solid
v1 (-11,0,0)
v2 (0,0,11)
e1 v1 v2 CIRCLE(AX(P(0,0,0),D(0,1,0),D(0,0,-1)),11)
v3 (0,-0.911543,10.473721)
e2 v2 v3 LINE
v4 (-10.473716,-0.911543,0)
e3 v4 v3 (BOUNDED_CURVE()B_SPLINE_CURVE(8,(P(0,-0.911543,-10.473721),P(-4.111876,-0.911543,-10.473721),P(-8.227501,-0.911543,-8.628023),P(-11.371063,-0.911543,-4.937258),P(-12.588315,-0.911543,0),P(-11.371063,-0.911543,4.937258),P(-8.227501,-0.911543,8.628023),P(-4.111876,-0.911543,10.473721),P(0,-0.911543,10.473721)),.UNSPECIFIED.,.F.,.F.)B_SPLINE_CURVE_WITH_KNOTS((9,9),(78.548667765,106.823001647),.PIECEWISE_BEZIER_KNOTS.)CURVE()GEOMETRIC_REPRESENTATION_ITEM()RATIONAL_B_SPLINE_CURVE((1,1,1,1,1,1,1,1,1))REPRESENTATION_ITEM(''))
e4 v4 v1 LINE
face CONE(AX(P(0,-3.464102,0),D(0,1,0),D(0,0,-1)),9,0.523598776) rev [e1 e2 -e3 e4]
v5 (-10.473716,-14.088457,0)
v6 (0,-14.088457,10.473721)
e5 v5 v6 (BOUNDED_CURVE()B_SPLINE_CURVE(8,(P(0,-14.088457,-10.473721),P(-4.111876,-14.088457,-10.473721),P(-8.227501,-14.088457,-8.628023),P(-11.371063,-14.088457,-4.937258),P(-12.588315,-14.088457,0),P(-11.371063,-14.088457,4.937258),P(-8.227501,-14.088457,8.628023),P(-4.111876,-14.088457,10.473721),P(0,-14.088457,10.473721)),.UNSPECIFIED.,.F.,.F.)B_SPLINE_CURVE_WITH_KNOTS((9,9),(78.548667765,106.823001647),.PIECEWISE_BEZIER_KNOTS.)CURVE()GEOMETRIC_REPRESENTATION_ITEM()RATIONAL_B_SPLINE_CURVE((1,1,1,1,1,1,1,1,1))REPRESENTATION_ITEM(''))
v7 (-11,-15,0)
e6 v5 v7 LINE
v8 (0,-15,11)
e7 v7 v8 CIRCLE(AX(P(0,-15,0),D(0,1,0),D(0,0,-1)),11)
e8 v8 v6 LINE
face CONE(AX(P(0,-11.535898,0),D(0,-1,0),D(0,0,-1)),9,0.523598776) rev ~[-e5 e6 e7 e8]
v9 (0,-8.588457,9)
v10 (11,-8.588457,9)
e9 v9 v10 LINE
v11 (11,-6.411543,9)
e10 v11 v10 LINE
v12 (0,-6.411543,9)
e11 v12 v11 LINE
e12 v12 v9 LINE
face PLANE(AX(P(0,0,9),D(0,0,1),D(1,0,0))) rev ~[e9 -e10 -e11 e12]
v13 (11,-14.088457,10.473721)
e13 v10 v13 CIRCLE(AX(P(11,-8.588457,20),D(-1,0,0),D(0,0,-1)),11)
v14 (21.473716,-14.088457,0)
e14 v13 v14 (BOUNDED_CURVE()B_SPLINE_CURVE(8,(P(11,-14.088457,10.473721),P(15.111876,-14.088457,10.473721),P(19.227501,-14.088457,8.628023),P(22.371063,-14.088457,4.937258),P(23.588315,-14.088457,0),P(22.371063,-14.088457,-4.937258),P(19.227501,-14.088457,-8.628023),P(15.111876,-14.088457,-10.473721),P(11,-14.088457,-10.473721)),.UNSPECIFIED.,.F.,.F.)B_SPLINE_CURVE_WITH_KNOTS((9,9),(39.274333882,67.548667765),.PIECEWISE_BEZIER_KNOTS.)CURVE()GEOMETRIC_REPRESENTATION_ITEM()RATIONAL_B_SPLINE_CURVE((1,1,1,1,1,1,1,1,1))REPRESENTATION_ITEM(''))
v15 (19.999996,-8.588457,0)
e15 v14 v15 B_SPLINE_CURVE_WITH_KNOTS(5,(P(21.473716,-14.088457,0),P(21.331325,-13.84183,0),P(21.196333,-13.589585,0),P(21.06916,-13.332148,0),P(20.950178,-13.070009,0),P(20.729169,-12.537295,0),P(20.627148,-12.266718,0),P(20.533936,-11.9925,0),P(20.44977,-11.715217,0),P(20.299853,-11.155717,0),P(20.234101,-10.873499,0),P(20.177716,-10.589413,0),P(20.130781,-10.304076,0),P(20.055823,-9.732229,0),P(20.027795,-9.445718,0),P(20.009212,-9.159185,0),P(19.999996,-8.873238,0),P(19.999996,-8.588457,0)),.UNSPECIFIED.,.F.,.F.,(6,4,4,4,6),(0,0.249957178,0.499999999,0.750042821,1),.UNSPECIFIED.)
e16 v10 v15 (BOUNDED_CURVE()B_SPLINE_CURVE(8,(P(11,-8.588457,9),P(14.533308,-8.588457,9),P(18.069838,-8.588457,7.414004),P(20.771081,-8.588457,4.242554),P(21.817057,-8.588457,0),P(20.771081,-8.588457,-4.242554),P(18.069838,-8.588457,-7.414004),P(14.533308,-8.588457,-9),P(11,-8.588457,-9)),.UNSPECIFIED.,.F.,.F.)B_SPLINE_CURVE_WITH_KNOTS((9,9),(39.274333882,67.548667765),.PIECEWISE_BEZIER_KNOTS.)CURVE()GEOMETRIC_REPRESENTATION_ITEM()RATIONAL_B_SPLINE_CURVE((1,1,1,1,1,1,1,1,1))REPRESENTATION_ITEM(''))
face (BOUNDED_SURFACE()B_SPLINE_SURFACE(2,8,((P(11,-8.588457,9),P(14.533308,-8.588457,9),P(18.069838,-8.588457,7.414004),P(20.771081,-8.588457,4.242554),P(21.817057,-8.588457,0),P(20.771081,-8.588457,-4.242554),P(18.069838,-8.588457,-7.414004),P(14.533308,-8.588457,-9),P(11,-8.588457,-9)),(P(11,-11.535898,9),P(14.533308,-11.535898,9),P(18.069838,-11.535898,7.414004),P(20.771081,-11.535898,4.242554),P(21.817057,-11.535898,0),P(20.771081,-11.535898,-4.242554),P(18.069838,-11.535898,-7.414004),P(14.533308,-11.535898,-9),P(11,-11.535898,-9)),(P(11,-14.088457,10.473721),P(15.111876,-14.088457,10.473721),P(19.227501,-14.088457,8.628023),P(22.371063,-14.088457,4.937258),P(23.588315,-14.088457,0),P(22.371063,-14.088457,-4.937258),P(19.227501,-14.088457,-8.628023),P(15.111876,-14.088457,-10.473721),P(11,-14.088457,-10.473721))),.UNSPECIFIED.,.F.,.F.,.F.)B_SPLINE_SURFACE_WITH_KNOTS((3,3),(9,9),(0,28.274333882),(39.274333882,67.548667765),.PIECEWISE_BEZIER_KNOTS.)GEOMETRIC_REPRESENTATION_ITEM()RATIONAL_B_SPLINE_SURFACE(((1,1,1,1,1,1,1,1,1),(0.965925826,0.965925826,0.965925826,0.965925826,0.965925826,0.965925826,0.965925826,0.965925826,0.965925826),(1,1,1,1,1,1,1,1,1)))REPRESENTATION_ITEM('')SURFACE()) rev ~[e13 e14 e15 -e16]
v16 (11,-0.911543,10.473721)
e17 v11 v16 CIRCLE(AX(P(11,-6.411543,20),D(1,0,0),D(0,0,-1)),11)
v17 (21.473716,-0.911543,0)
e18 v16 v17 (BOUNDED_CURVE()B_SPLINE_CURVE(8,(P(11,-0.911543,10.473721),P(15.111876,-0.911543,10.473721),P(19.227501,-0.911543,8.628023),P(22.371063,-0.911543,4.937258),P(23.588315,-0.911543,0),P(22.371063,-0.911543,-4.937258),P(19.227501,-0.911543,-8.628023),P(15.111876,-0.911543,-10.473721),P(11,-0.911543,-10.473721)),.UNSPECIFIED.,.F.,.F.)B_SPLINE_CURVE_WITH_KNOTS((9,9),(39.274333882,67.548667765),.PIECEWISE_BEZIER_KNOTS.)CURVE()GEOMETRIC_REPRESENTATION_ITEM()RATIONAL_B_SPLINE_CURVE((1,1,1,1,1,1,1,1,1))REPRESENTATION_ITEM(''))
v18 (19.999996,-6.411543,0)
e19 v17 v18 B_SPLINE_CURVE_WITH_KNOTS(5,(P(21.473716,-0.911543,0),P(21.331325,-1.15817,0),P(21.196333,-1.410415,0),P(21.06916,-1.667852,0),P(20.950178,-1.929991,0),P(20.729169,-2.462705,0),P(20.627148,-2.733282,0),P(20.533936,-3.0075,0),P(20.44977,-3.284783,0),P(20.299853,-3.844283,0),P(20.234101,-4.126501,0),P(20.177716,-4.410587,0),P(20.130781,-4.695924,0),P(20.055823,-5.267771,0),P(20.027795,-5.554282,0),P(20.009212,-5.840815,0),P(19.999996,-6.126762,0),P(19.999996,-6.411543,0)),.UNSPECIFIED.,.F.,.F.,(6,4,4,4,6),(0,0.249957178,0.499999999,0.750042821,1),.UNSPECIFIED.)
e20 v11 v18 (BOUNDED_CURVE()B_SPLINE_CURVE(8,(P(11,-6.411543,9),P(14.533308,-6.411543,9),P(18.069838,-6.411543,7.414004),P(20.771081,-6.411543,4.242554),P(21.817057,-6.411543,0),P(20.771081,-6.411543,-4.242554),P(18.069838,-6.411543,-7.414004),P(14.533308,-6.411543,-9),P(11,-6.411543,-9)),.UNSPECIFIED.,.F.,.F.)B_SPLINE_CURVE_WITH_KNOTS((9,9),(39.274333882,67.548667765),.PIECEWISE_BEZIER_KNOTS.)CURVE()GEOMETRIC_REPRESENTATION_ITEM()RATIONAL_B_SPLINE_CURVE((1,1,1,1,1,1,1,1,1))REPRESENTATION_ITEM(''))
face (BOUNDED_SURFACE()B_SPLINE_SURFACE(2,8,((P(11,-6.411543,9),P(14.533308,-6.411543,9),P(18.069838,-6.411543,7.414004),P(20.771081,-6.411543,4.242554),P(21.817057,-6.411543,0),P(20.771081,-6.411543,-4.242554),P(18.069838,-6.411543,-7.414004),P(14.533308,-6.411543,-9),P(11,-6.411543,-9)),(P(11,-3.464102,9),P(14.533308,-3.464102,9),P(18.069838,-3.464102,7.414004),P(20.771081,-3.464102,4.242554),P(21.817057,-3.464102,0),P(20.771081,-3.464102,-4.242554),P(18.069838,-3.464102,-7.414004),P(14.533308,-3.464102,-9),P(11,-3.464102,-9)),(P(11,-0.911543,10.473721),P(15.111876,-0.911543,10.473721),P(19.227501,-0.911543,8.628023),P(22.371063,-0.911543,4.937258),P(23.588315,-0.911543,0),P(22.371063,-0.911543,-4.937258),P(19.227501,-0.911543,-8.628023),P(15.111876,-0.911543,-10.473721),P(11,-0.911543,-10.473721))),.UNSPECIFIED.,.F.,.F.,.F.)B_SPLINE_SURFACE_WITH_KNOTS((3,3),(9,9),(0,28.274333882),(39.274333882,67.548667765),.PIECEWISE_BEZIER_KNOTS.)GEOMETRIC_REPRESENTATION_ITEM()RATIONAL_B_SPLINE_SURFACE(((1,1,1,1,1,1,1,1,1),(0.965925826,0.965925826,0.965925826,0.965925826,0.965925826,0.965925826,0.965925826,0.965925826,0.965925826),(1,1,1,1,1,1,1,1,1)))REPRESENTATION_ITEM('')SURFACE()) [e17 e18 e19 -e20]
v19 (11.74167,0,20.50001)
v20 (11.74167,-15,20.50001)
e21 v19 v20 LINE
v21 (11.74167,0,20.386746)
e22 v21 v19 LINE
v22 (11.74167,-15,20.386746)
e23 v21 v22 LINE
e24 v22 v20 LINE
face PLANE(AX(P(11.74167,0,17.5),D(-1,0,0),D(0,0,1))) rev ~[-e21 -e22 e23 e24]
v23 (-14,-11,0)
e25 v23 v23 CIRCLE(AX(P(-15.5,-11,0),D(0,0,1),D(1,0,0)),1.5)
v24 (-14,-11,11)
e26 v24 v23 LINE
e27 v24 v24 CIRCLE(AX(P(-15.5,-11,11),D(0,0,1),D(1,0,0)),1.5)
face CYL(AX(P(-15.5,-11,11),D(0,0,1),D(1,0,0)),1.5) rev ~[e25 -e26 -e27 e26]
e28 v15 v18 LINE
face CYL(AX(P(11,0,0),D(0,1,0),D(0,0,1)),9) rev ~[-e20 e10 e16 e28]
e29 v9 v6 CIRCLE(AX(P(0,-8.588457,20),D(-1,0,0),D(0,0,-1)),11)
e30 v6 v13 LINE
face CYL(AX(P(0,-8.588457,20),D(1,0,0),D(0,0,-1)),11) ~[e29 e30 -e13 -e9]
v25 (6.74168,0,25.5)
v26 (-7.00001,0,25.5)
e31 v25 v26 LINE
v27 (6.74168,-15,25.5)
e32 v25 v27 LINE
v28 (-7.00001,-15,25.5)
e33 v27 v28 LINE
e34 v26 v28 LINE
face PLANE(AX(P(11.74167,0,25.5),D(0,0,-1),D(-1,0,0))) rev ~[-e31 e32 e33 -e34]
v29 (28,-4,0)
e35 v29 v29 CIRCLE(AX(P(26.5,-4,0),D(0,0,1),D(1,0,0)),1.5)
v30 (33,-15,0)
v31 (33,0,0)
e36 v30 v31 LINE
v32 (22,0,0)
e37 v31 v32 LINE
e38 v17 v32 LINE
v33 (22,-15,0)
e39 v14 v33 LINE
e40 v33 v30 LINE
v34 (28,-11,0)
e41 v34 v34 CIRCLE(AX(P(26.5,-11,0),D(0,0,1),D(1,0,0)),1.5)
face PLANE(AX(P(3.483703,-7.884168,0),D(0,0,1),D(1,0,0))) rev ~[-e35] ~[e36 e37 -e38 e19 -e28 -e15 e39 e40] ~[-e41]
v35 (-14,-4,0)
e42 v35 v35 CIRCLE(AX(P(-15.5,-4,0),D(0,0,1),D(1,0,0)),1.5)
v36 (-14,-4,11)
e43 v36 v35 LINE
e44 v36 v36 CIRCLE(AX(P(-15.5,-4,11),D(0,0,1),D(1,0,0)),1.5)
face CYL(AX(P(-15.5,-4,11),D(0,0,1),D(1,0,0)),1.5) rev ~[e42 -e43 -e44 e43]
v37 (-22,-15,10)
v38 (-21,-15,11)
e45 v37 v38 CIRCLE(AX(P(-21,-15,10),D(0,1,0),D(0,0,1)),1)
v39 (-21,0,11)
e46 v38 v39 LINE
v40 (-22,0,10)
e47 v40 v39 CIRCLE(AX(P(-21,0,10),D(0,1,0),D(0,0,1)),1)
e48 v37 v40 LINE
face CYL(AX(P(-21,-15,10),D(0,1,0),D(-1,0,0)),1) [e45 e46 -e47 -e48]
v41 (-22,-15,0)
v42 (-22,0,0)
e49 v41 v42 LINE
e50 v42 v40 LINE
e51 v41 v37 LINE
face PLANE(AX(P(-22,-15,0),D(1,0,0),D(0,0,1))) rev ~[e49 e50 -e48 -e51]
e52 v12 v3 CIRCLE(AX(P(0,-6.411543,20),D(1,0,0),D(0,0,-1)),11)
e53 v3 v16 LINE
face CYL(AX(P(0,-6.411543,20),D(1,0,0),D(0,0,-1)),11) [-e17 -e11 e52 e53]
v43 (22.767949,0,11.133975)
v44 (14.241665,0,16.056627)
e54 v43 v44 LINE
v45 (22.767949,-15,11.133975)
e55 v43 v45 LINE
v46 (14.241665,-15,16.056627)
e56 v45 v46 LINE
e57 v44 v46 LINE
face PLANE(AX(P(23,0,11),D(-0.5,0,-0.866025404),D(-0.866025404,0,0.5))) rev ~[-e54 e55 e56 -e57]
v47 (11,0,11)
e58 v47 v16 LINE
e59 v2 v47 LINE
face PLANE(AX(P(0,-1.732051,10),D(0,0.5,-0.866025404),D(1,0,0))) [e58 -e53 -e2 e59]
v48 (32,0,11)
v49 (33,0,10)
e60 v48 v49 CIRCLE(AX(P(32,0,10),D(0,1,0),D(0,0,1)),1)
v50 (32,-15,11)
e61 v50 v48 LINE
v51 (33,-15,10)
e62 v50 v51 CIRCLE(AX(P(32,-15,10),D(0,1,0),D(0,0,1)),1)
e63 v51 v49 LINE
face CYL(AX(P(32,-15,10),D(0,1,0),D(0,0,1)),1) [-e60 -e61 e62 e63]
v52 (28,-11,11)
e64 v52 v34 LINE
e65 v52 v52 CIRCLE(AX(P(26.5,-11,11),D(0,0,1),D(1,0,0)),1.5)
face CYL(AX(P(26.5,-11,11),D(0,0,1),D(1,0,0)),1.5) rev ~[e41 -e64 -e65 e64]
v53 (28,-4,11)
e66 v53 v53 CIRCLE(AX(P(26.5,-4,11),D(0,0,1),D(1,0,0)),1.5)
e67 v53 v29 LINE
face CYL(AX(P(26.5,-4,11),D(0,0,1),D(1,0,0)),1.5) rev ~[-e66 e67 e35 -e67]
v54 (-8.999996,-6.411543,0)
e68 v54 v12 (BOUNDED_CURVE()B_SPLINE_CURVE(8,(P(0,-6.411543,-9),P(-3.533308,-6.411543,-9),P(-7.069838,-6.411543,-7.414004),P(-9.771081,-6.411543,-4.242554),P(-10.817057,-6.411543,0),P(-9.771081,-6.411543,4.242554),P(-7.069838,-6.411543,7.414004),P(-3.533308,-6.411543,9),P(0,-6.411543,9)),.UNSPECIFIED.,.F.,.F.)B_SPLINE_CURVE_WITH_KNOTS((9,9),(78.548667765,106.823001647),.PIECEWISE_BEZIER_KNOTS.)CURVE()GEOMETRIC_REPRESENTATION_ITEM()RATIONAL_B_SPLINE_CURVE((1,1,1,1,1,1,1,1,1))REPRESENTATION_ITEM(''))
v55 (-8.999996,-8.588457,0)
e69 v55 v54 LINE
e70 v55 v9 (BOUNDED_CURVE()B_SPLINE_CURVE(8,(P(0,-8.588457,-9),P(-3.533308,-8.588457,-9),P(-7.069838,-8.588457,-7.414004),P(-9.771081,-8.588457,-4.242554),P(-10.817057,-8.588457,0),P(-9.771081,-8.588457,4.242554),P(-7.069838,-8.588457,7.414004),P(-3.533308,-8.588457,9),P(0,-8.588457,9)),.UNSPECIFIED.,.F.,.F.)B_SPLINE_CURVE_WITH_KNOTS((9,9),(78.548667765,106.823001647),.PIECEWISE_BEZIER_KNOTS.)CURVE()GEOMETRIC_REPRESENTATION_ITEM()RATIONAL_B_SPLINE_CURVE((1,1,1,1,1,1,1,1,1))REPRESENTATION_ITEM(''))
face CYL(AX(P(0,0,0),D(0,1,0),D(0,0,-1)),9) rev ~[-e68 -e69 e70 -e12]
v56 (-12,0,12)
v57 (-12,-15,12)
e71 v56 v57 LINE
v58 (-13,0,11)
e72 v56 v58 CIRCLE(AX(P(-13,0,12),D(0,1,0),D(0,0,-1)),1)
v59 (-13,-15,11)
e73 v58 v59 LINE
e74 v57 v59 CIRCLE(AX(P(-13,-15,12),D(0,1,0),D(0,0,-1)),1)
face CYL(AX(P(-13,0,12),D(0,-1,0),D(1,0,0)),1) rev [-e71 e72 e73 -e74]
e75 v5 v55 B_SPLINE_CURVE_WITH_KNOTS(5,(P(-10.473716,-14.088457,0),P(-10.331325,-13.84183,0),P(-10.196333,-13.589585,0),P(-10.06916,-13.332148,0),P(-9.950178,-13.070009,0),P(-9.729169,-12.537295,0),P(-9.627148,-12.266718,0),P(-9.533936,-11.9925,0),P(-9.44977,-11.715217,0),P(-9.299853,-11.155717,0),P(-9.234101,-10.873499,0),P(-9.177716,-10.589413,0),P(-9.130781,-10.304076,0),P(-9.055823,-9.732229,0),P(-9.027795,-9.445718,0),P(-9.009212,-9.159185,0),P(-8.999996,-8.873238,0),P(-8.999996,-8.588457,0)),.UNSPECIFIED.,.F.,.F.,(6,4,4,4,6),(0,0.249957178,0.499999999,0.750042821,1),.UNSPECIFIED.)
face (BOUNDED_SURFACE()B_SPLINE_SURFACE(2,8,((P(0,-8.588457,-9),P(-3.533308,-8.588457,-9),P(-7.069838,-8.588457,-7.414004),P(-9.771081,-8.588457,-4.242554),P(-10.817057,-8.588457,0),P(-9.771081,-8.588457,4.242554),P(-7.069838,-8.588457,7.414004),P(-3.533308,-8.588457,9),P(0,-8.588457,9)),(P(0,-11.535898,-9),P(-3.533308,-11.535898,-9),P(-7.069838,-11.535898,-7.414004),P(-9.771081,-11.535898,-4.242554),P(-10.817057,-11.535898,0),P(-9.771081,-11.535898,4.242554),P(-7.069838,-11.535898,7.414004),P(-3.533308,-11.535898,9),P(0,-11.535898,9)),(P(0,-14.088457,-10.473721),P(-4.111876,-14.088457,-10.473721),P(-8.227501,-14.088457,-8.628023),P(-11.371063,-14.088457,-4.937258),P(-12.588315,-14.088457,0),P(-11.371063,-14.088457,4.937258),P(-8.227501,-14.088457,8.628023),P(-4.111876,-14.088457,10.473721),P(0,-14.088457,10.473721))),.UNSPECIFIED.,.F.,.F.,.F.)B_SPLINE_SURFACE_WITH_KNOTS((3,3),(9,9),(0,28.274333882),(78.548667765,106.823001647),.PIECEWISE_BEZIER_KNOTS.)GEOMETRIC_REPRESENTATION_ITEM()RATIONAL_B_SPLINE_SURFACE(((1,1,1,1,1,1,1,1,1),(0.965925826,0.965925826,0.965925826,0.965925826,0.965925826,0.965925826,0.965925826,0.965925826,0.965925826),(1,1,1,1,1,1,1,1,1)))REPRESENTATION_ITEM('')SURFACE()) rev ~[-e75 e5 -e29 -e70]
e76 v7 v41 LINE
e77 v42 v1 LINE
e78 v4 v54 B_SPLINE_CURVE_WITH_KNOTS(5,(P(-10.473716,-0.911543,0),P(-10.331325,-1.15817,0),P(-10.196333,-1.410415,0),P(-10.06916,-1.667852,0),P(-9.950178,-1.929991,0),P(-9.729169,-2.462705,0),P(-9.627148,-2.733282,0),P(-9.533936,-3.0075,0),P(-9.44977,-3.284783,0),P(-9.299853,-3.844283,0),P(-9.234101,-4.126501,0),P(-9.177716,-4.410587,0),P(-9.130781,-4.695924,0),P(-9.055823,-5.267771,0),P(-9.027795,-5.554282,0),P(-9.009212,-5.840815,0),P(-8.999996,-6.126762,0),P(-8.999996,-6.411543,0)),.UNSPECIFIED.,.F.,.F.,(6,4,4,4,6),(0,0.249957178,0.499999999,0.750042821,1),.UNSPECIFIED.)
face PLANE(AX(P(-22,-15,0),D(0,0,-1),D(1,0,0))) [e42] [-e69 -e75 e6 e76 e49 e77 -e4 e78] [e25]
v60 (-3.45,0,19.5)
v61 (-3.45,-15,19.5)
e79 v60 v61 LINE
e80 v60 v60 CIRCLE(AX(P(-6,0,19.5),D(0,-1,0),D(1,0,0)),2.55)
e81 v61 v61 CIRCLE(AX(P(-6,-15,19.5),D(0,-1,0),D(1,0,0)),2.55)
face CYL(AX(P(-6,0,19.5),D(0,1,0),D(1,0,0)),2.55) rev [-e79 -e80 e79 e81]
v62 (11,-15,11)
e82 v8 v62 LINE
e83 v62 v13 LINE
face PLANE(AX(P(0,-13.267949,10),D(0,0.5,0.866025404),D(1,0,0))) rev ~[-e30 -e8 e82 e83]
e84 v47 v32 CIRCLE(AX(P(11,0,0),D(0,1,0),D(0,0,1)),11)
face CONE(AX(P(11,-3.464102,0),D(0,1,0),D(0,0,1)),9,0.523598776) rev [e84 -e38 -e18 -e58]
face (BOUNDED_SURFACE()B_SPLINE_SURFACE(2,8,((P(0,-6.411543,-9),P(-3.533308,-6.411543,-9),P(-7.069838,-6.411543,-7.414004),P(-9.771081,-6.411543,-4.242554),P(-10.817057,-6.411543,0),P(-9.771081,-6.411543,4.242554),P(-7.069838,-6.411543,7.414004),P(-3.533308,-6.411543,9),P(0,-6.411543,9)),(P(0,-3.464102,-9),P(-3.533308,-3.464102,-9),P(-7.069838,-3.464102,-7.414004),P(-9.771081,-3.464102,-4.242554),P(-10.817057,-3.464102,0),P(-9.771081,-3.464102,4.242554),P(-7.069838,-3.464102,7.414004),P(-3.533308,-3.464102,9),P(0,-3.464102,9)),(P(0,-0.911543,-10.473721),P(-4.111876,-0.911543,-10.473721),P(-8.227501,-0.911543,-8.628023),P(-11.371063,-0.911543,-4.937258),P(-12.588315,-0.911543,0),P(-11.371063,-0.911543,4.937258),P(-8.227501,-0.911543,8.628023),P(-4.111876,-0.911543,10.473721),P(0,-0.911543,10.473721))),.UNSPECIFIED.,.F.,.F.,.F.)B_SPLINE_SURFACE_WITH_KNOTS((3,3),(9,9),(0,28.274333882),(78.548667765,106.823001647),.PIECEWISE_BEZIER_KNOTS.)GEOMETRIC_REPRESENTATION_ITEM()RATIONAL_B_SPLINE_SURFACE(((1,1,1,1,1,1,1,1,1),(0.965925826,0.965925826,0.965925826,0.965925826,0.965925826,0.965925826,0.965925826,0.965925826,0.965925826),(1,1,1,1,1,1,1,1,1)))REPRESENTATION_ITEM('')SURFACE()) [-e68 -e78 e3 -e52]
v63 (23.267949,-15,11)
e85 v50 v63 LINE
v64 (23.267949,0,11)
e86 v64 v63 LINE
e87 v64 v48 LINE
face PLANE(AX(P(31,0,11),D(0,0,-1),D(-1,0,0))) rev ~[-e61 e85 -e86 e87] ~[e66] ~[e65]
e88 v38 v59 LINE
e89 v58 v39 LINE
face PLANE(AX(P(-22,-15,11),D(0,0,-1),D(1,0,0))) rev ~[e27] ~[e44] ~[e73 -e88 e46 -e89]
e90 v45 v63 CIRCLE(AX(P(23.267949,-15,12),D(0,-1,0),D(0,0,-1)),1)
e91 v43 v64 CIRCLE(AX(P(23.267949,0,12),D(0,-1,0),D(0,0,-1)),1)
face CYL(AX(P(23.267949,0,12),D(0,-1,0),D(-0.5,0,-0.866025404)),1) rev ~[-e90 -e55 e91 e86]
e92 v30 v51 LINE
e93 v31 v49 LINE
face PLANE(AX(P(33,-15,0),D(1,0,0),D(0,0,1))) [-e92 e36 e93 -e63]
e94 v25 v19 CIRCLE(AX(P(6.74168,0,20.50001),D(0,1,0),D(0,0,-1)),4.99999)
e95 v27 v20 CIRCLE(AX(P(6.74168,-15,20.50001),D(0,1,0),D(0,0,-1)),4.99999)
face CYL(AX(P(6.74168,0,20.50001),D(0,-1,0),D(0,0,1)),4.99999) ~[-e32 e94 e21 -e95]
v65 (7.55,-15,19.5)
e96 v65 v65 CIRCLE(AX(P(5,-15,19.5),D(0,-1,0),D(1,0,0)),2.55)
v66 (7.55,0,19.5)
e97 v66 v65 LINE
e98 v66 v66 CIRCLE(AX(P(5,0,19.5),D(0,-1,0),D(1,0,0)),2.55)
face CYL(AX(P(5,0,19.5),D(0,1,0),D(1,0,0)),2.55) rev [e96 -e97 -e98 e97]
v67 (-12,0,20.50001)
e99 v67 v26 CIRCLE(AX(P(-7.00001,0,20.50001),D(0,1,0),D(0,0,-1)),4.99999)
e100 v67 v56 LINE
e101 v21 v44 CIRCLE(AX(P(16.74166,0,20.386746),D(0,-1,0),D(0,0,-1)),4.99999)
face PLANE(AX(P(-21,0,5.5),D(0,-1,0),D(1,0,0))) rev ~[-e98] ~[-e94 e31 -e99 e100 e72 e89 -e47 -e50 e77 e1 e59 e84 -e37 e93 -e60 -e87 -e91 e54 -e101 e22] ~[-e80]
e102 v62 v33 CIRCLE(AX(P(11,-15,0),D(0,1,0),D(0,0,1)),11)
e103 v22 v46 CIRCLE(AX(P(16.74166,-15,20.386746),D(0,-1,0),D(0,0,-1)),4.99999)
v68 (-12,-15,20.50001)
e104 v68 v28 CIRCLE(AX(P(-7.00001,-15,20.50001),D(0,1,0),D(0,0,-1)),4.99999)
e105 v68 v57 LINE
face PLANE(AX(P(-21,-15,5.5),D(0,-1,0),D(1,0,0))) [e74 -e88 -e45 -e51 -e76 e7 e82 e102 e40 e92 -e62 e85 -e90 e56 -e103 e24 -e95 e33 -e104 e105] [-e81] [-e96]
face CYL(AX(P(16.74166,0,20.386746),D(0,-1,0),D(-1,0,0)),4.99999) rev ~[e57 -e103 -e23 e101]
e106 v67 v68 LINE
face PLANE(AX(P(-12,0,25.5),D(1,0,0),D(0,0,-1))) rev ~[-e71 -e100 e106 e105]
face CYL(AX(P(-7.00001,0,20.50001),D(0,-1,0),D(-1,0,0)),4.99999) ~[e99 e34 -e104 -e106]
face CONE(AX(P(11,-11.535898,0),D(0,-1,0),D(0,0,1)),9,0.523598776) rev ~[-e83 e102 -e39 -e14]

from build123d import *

# Parameters (mm, degrees)
F0_R       = 2.55
F1_DEPTH   = 15
F2_R       = 4.99999
F3_R       = 1.5
F4_DEPTH   = 25
F5_R       = 1.5
F6_DEPTH   = 25
F7_SIZE2   = 3.4641016151
F7_SIZE    = 2
F7_2_SIZE2 = 3.4641016151
F7_2_SIZE  = 2
F8_R       = 11
F9_R       = 1
F10_W      = 76.274741441
F10_H      = 34.1036086902
F11_DEPTH  = 25
F12_W      = 2
F12_H      = 11
F13_DEPTH  = 15
F14_R      = 1


# Not quite as in the source:
# - a fillet or chamfer is up to 0.001 mm smaller than in the source, because OpenCascade refuses the exact size


with BuildPart() as f1:
    # F0 (on Front) → F1 (new body)
    with BuildSketch(Plane.XZ):
        Polygon((-20, 11), (-20, 0), (-20, -10), (-12, -10), (-12, -15), (23, -15), (23, -10), (31, -10), (31, 11), (23, 11), (11.7416697508, 17.5), (11.7416697508, 25.5), (-12, 25.5), (-12, 11), align=None)
        with BuildLine():
            ThreePointArc((0, -9), (-9, 0), (0, 9))
            Line((0, 9), (11, 9))
            ThreePointArc((11, 9), (20, 0), (11, -9))
            Line((11, -9), (0, -9))
        make_face(mode=Mode.SUBTRACT)
        with Locations((-6, 19.5)):
            Circle(F0_R, mode=Mode.SUBTRACT)
        with Locations((5, 19.5)):
            Circle(F0_R, mode=Mode.SUBTRACT)
    extrude(amount=F1_DEPTH)

    # F2 (radius 5 in the source; OpenCascade refuses exactly that, so slightly less here)
    f2_edges = [f1.edges().sort_by_distance(p)[0] for p in [
        (11.74167, -7.5, 25.5),
        (-12, -7.5, 25.5),
        (-12, -7.5, -15),
        (23, -7.5, -15),
        (11.74167, -7.5, 17.5),
    ]]
    fillet(f2_edges, radius=F2_R)

    # F3 (on face) → F4 (cut)
    with BuildSketch(Plane.XY.offset(11)):
        with Locations((-15.5, -4)):
            Circle(F3_R)
        with Locations((-15.5, -11)):
            Circle(F3_R)
    extrude(amount=-F4_DEPTH, mode=Mode.SUBTRACT)

    # F5 (on face) → F6 (cut)
    with BuildSketch(Plane.XY.offset(11)):
        with Locations((26.5, -4)):
            Circle(F5_R)
        with Locations((26.5, -11)):
            Circle(F5_R)
    extrude(amount=-F6_DEPTH, mode=Mode.SUBTRACT)

    # F7
    f7_edges = [f1.edges().sort_by_distance(p)[0] for p in [
        (-9, 0, 0),
        (5.5, 0, 9),
    ]]
    f7_side = f1.faces().sort_by_distance((11.090421, 0, 20.443378))[0]
    chamfer(f7_edges, length=F7_SIZE, length2=F7_SIZE2, reference=f7_side)

    # F7#2
    f7_2_edges = [f1.edges().sort_by_distance(p)[0] for p in [
        (5.5, -15, 9),
    ]]
    f7_2_side = f1.faces().sort_by_distance((11.090421, -15, 20.443378))[0]
    chamfer(f7_2_edges, length=F7_2_SIZE, length2=F7_2_SIZE2, reference=f7_2_side)

    # F8
    f8_edges = [f1.edges().sort_by_distance(p)[0] for p in [
        (-9, -11.535898, 0),
        (-9, -3.464102, 0),
        (5.5, -11.535898, 9),
        (5.5, -3.464102, 9),
    ]]
    fillet(f8_edges, radius=F8_R)

    # F9
    f9_edges = [f1.edges().sort_by_distance(p)[0] for p in [
        (-12, -7.5, 11),
        (23, -7.5, 11),
    ]]
    fillet(f9_edges, radius=F9_R)

    # F10 (on Top) → F11 (cut)
    with BuildSketch(Plane.XY):
        with Locations((3.48370336, -7.8841676004)):
            Rectangle(F10_W, F10_H)
    extrude(amount=-F11_DEPTH, mode=Mode.SUBTRACT)

    # F12 (on face) → F13 (join)
    with BuildSketch(Plane.XZ.offset(15)):
        with Locations((-21, 5.5)):
            Rectangle(F12_W, F12_H)
        with Locations((32, 5.5)):
            Rectangle(F12_W, F12_H)
    extrude(amount=-F13_DEPTH)

    # F14
    f14_edges = [f1.edges().sort_by_distance(p)[0] for p in [
        (-22, -7.5, 11),
        (33, -7.5, 11),
    ]]
    fillet(f14_edges, radius=F14_R)


solid = f1.part
